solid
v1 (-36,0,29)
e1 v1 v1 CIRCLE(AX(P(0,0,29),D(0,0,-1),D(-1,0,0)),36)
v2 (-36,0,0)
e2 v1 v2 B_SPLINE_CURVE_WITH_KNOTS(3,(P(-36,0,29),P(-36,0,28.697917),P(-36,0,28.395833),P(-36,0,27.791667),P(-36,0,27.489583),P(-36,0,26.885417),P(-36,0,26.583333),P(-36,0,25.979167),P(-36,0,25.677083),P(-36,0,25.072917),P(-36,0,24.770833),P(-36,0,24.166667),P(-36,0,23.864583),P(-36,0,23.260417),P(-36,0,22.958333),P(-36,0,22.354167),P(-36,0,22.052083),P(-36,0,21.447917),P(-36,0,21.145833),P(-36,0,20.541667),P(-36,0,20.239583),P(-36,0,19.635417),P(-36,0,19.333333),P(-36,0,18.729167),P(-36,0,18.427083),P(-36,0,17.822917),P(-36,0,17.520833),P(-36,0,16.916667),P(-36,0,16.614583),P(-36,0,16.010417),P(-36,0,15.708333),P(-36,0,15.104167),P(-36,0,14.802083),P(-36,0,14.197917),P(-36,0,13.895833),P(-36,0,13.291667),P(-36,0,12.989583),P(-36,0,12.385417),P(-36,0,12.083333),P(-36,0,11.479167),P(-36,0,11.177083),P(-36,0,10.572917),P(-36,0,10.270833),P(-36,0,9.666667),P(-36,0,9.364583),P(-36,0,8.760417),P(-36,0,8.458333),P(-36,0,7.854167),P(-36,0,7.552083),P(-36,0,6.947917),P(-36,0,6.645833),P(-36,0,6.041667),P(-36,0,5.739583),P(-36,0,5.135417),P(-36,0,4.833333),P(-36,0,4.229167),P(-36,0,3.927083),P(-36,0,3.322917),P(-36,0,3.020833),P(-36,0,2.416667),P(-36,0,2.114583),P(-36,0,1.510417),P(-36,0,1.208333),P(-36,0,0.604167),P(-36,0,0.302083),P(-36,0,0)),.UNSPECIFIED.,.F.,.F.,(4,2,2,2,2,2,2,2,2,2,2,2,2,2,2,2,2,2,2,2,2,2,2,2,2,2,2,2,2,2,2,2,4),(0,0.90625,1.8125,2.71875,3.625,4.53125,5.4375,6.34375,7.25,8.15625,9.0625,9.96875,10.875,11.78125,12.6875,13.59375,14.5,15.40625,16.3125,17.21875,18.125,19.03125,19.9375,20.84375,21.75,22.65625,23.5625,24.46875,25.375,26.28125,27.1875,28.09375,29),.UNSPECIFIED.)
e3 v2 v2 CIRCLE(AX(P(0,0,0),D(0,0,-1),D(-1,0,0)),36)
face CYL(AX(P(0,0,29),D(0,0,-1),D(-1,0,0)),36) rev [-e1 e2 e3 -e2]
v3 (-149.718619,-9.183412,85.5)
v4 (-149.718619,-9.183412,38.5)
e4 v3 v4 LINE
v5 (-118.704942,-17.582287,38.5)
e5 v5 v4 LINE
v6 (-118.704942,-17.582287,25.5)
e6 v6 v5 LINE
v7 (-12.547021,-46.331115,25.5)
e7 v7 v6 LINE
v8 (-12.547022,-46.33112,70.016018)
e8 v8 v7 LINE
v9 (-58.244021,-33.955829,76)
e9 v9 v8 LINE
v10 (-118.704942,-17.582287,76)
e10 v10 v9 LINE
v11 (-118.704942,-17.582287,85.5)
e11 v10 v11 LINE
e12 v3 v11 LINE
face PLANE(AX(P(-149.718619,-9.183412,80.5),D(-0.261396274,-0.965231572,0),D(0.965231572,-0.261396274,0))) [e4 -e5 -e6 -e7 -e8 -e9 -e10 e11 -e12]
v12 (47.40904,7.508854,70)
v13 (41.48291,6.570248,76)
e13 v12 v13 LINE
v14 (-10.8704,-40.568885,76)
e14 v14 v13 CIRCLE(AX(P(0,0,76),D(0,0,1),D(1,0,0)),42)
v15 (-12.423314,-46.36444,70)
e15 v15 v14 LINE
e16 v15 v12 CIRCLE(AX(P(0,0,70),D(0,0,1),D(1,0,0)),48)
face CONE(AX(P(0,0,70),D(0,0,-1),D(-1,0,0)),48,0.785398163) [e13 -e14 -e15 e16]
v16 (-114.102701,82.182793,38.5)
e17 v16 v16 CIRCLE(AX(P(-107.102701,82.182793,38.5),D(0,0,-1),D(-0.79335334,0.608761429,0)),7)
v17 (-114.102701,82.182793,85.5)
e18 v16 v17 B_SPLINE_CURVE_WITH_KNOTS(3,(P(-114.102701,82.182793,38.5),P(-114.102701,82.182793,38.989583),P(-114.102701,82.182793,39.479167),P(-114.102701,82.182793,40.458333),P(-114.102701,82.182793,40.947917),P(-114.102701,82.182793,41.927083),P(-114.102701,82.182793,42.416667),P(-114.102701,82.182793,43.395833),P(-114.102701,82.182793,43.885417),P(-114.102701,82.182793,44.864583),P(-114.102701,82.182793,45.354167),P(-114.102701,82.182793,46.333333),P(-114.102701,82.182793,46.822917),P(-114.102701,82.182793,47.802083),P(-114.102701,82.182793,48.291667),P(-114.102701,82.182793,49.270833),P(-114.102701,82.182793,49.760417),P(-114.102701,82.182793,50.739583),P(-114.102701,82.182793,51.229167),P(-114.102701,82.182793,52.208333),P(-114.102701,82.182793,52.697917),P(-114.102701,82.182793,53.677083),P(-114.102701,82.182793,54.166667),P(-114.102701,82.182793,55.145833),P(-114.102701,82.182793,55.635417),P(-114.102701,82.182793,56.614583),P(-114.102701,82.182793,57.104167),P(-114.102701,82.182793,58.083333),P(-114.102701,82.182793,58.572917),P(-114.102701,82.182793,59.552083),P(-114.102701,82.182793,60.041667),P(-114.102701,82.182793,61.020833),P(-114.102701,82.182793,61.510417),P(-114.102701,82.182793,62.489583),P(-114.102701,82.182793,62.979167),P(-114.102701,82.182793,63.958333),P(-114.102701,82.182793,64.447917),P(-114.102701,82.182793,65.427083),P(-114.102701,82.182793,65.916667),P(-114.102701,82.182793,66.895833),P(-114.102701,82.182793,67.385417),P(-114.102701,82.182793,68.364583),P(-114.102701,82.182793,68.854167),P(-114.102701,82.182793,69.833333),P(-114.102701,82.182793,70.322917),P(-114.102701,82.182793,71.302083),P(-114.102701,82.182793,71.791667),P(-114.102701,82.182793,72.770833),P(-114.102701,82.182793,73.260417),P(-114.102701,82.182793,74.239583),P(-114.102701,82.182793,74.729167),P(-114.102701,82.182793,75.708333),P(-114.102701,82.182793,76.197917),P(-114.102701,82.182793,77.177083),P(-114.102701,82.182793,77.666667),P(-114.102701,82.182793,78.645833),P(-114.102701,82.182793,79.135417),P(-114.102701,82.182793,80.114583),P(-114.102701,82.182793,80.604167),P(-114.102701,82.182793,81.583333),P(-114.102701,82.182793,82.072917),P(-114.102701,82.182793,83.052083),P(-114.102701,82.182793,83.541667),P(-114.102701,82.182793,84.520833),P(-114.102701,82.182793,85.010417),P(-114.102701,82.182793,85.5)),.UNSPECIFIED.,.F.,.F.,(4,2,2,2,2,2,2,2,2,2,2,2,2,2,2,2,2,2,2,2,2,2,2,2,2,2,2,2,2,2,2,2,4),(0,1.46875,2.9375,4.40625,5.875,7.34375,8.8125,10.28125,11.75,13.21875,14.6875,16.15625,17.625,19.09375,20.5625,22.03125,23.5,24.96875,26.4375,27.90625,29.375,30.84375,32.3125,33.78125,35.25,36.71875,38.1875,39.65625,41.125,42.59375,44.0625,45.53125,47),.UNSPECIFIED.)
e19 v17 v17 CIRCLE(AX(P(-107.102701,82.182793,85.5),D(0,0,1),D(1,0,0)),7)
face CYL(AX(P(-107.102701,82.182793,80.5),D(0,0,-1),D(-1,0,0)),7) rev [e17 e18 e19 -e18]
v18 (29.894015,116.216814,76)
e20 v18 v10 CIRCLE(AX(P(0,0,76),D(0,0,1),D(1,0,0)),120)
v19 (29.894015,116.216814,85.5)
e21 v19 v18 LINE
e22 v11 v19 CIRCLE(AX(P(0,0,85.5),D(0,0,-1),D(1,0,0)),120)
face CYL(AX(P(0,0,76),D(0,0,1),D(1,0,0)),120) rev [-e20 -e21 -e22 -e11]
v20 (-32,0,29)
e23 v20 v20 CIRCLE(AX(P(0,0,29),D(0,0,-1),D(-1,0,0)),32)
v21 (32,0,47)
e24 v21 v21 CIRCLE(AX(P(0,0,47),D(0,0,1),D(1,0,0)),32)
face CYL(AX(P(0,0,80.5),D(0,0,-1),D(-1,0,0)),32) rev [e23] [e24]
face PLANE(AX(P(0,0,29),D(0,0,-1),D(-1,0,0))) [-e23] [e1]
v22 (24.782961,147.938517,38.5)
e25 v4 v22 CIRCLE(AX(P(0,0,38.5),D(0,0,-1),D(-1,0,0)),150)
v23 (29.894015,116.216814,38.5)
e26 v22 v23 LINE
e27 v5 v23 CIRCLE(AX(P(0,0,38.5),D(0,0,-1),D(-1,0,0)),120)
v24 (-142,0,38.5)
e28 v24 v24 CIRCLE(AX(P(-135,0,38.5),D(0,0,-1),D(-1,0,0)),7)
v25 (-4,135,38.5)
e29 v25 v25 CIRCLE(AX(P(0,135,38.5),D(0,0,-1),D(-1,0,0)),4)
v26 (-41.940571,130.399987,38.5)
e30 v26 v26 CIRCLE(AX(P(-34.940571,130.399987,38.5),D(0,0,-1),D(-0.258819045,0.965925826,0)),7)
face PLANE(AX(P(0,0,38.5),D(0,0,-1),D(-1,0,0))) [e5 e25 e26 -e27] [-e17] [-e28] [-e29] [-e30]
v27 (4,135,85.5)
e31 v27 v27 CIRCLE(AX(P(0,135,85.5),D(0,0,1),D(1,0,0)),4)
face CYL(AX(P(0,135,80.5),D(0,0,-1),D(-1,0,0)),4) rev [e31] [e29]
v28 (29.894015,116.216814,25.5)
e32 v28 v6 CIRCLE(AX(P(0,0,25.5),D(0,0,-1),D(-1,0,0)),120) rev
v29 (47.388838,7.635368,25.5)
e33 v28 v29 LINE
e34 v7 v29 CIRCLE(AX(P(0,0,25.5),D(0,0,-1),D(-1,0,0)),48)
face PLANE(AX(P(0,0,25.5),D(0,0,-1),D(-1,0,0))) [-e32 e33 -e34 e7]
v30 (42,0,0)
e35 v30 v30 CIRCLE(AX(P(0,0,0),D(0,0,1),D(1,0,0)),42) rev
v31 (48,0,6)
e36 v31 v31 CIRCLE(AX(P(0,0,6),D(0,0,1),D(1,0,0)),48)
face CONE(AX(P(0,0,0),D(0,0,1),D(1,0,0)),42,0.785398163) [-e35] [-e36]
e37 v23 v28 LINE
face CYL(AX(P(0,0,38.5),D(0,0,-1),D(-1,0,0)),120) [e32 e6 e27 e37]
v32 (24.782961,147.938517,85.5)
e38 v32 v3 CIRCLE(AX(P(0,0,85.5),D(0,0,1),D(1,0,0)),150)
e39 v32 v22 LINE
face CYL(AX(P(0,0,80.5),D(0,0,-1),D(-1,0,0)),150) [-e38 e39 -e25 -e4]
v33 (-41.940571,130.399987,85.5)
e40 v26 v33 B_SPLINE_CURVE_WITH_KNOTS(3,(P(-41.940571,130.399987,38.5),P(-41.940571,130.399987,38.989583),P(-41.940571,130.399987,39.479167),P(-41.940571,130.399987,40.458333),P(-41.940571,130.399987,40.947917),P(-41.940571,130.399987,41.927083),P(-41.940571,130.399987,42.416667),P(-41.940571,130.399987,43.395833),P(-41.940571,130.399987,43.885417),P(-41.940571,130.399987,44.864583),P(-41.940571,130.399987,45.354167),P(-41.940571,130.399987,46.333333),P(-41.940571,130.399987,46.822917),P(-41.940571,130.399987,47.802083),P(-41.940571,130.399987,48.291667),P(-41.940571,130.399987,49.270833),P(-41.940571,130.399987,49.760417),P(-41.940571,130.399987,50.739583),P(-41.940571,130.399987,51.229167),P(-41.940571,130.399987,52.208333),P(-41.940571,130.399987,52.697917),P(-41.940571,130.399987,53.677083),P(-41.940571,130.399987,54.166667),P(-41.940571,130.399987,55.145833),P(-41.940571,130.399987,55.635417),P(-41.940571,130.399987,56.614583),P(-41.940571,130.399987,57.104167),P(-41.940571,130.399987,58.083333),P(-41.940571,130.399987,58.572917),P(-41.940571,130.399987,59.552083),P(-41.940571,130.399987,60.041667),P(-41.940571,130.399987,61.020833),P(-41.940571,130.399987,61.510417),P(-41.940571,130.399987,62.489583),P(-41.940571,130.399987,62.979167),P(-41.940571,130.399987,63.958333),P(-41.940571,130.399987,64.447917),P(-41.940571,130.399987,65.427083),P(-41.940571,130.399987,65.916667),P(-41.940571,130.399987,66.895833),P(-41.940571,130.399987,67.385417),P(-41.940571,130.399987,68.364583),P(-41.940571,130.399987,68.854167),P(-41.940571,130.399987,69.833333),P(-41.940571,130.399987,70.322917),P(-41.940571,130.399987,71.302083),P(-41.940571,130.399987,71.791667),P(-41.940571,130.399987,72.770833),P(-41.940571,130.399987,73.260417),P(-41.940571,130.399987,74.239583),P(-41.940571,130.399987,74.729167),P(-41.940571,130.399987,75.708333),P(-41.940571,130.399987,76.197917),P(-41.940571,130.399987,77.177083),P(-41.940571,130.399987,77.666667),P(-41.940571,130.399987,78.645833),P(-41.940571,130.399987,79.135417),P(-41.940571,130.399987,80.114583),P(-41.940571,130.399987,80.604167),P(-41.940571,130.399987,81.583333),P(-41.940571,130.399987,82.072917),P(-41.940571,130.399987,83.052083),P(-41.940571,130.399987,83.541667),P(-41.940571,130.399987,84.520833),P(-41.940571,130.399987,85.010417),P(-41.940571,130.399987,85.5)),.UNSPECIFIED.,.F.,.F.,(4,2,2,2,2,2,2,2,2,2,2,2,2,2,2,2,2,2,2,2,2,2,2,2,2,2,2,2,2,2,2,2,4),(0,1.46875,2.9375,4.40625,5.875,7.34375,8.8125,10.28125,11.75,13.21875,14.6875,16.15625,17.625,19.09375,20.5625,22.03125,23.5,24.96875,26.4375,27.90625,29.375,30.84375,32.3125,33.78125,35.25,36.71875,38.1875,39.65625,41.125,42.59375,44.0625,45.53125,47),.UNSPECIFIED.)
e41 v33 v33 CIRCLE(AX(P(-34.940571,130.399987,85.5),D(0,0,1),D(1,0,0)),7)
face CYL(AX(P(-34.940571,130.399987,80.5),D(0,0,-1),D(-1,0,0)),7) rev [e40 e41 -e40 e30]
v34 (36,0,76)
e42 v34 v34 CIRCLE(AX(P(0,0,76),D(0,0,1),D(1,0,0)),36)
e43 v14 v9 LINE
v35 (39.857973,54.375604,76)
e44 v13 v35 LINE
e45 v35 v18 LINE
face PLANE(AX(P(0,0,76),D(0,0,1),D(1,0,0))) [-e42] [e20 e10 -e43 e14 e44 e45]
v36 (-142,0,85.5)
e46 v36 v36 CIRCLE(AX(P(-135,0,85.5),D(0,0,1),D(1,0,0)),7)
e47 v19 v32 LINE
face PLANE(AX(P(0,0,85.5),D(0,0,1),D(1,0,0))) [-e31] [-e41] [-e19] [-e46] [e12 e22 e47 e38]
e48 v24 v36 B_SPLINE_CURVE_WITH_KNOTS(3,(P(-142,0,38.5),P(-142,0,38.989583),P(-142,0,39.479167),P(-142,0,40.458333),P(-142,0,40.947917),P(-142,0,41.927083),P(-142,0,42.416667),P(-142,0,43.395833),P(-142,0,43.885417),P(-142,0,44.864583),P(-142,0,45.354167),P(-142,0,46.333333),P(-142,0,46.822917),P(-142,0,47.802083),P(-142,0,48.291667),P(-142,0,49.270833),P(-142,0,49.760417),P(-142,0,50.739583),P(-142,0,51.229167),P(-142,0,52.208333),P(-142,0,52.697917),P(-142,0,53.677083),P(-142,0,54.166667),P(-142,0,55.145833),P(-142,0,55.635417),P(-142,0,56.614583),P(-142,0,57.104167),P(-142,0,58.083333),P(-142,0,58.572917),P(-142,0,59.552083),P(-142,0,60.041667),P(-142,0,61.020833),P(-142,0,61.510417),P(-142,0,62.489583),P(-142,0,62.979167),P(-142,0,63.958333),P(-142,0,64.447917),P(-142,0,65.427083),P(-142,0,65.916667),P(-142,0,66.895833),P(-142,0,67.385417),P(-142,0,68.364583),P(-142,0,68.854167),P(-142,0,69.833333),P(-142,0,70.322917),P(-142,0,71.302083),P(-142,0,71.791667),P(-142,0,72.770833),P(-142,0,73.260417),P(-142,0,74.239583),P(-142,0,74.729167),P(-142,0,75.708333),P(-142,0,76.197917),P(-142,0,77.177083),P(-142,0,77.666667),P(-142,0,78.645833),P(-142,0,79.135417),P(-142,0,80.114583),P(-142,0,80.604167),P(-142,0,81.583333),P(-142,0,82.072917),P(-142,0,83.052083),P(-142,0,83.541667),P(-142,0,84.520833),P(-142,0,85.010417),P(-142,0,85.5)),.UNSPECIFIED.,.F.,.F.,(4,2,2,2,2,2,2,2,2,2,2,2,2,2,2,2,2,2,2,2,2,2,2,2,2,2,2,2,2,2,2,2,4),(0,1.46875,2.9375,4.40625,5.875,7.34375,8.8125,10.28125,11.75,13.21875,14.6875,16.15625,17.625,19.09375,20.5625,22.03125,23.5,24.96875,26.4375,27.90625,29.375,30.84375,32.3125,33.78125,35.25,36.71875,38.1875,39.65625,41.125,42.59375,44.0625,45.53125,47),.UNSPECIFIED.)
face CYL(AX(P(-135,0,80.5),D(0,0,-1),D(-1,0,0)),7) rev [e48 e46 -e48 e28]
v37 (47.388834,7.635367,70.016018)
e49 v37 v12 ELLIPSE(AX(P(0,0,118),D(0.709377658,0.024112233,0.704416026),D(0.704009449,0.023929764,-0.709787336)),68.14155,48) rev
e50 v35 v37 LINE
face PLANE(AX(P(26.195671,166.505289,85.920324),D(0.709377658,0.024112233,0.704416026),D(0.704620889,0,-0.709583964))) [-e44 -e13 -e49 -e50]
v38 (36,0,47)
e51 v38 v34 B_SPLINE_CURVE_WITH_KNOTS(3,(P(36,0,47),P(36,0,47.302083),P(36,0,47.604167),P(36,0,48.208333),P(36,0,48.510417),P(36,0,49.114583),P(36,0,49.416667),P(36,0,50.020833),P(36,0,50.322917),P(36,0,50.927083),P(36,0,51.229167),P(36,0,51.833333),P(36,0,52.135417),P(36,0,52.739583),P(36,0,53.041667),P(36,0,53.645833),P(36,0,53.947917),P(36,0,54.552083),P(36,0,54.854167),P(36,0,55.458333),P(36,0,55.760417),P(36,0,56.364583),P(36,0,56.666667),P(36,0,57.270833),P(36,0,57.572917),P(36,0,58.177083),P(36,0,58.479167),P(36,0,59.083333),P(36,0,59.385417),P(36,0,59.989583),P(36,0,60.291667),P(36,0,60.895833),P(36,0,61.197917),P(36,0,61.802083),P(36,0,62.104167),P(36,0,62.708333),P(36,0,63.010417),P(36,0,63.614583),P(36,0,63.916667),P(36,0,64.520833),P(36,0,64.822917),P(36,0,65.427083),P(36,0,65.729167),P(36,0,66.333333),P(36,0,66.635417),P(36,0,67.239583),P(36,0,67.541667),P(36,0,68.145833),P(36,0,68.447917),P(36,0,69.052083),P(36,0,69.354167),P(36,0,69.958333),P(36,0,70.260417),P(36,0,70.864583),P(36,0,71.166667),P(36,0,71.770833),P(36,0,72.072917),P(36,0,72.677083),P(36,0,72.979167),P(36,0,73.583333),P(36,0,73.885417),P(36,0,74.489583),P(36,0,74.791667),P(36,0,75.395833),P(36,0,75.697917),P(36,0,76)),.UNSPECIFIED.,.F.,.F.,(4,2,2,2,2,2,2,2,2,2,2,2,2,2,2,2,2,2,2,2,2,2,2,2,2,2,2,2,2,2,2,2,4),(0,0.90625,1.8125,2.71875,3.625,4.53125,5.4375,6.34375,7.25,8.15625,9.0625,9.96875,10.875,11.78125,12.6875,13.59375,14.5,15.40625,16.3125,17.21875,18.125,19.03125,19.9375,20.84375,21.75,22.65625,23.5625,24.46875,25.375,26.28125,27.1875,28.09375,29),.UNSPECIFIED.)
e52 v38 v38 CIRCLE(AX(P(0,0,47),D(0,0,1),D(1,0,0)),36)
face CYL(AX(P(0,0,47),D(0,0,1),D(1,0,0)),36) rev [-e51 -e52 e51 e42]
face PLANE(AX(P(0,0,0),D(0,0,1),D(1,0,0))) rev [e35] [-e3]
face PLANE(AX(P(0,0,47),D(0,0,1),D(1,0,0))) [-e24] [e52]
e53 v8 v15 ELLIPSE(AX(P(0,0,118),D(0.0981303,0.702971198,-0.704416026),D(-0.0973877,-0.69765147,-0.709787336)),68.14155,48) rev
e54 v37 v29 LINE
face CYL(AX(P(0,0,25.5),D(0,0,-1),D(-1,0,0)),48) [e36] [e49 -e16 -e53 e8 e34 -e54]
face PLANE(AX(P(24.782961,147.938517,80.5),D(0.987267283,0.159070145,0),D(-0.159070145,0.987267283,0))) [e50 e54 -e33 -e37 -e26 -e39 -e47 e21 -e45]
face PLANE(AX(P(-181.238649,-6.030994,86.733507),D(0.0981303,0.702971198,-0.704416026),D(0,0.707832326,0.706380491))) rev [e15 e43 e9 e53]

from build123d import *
from OCP.BRepAlgoAPI import BRepAlgoAPI_Cut
from OCP.TopTools import TopTools_ListOfShape
from build123d.topology import SkipClean

# Parameters (mm, degrees)
SCHIZZO1_R                          = 150
SCHIZZO1_R_2                        = 32
ESTRUSIONE1_DEPTH                   = 80.5
SCHIZZO2_R                          = 120
ESTRUSIONE2_DEPTH                   = 4.5
SCHIZZO3_R                          = 36
ESTRUSIONE3_DEPTH                   = 29
ESTRUSIONE4_START                   = -29
SCHIZZO4_R                          = 36
ESTRUSIONE4_DEPTH                   = 29
SCHIZZO5_OUTSIDE_W                  = 388.366
SCHIZZO5_OUTSIDE_H                  = 388.366
SCHIZZO5_OUTSIDE_R                  = 120
ESTRUSIONE5_DEPTH                   = 38.5
SCHIZZO6_OUTSIDE_W                  = 388.366
SCHIZZO6_OUTSIDE_H                  = 388.366
SCHIZZO6_OUTSIDE_R                  = 48
ESTRUSIONE6_DEPTH                   = 25.5
SCHIZZO7_R                          = 4
ESTRUSIONE7_DEPTH                   = 220.146070008
SCHIZZO8_R                          = 7
ESTRUSIONE8_DEPTH                   = 217.249855491
RIPETIZIONECIRCOLARE1_COUNT         = 3
RIPETIZIONECIRCOLARE1_ANGLE         = 75
SCHIZZO9_OUTSIDE_W                  = 388.366
SCHIZZO9_OUTSIDE_H                  = 388.366
ESTRUSIONE9_DEPTH                   = 220.146070008
SMUSSO1_SIZE                        = 6
TAGLIA_RIVOLUZIONE1_ANGLE           = 15
TAGLIA_RIVOLUZIONE1_OTHER_WAY_ANGLE = 99
ESTRUSIONE10_DEPTH                  = 222.553987295
ESTRUSIONE11_DEPTH                  = 222.120460483
SCHIZZO14_R                         = 7
SCHIZZO14_R_2                       = 4
ESTRUSIONE12_DEPTH                  = 5


with BuildPart() as part:
    # Schizzo1 → Estrusione1 (new body)
    with BuildSketch(Plane.XY):
        Circle(SCHIZZO1_R)
        Circle(SCHIZZO1_R_2, mode=Mode.SUBTRACT)
    extrude(amount=ESTRUSIONE1_DEPTH)

    # Schizzo2 → Estrusione2 (cut)
    with BuildSketch(Plane.XY.offset(80.5)):
        Circle(SCHIZZO2_R)
    extrude(amount=-ESTRUSIONE2_DEPTH, mode=Mode.SUBTRACT)

    # Schizzo3 → Estrusione3 (cut)
    with BuildSketch(Plane.XY.offset(76)):
        Circle(SCHIZZO3_R)
    extrude(amount=-ESTRUSIONE3_DEPTH, mode=Mode.SUBTRACT)

    # Schizzo4 → Estrusione4 (cut)
    with BuildSketch(Plane(origin=(0, 0, 0), x_dir=(-1, 0, 0), z_dir=(0, 0, -1)).offset(ESTRUSIONE4_START)):
        Circle(SCHIZZO4_R)
    extrude(amount=ESTRUSIONE4_DEPTH, mode=Mode.SUBTRACT)

    # Schizzo5 outside → Estrusione5 (cut)
    with BuildSketch(Plane(origin=(0, 0, 0), x_dir=(-1, 0, 0), z_dir=(0, 0, -1))):
        Rectangle(SCHIZZO5_OUTSIDE_W, SCHIZZO5_OUTSIDE_H)
        Circle(SCHIZZO5_OUTSIDE_R, mode=Mode.SUBTRACT)
    extrude(amount=-ESTRUSIONE5_DEPTH, mode=Mode.SUBTRACT)

    # Schizzo6 outside → Estrusione6 (cut)
    with BuildSketch(Plane(origin=(0, 0, 0), x_dir=(-1, 0, 0), z_dir=(0, 0, -1))):
        Rectangle(SCHIZZO6_OUTSIDE_W, SCHIZZO6_OUTSIDE_H)
        Circle(SCHIZZO6_OUTSIDE_R, mode=Mode.SUBTRACT)
    extrude(amount=-ESTRUSIONE6_DEPTH, mode=Mode.SUBTRACT)

    # Schizzo7 → Estrusione7 (cut, through all)
    with BuildSketch(Plane(origin=(0, 0, 25.5), x_dir=(-1, 0, 0), z_dir=(0, 0, -1))):
        with Locations((0, 135)):
            Circle(SCHIZZO7_R)
    extrude(amount=-ESTRUSIONE7_DEPTH, mode=Mode.SUBTRACT)

    # Schizzo8 → Estrusione8 (cut, through all)
    with BuildSketch(Plane(origin=(0, 0, 38.5), x_dir=(-1, 0, 0), z_dir=(0, 0, -1))):
        with Locations((135, 0)):
            Circle(SCHIZZO8_R)
    estrusione8 = extrude(amount=-ESTRUSIONE8_DEPTH, mode=Mode.SUBTRACT)

    # RipetizioneCircolare1: Estrusione8 ×3 about axis
    ripetizionecircolare1_axis = Axis((0, 0, 38.5), (0, 0, -1))
    for i in range(1, RIPETIZIONECIRCOLARE1_COUNT):
        add(estrusione8.rotate(ripetizionecircolare1_axis, i * RIPETIZIONECIRCOLARE1_ANGLE / (RIPETIZIONECIRCOLARE1_COUNT - 1)), mode=Mode.SUBTRACT)

    # Schizzo9 outside → Estrusione9 (cut, through all)
    with BuildSketch(Plane(origin=(0, 0, 25.5), x_dir=(-1, 0, 0), z_dir=(0, 0, -1))):
        Rectangle(SCHIZZO9_OUTSIDE_W, SCHIZZO9_OUTSIDE_H)
        with BuildLine():
            Line((-24.782961399, 147.938517041), (-47.388837837, 7.635368288))
            ThreePointArc((-47.388837837, 7.635368288), (-32.118274684, -35.670957819), (12.547023337, -46.331123511))
            Line((12.547023337, -46.331123511), (149.718619236, -9.183411899))
            ThreePointArc((149.718619236, -9.183411899), (100.369590954, 111.471723822), (-24.782961399, 147.938517041))
        make_face(mode=Mode.SUBTRACT)
    extrude(amount=-ESTRUSIONE9_DEPTH, mode=Mode.SUBTRACT)

    # Smusso1
    smusso1_edges = [part.edges().sort_by_distance(p)[0] for p in [
        (48, 0, 0),
    ]]
    chamfer(smusso1_edges, length=SMUSSO1_SIZE)


with BuildPart() as taglia_rivoluzione1_tool:
    # Schizzo10 → Taglia-Rivoluzione1 (revolve)
    with BuildSketch(Plane(origin=(0, 0, 0), x_dir=(0, 0, -1), z_dir=(1, 0, 0))):
        Polygon((-76, -42), (-70, -48), (-76, -48), align=None)
    revolve(axis=Axis((0, 0, 80.5), (0, 0, -1)), revolution_arc=TAGLIA_RIVOLUZIONE1_ANGLE)


with BuildPart() as part_1:
    add(part.part)

    # Taglia-Rivoluzione1: cut by taglia_rivoluzione1_tool, with a tolerance
    taglia_rivoluzione1_stock = TopTools_ListOfShape()
    taglia_rivoluzione1_stock.Append(part_1.part.wrapped)
    taglia_rivoluzione1_tools = TopTools_ListOfShape()
    taglia_rivoluzione1_tools.Append(taglia_rivoluzione1_tool.part.wrapped)
    taglia_rivoluzione1_cut = BRepAlgoAPI_Cut()
    taglia_rivoluzione1_cut.SetArguments(taglia_rivoluzione1_stock)
    taglia_rivoluzione1_cut.SetTools(taglia_rivoluzione1_tools)
    taglia_rivoluzione1_cut.SetFuzzyValue(0.00001)
    taglia_rivoluzione1_cut.Build()
    add(Compound.cast(taglia_rivoluzione1_cut.Shape()).solids(), mode=Mode.REPLACE)


with BuildPart() as taglia_rivoluzione1_other_way_tool:
    # Schizzo10 → Taglia-Rivoluzione1 other way (revolve)
    with BuildSketch(Plane(origin=(0, 0, 0), x_dir=(0, 0, -1), z_dir=(1, 0, 0))):
        Polygon((-76, -42), (-70, -48), (-76, -48), align=None)
    revolve(axis=Axis((0, 0, 80.5), (0, 0, 1)), revolution_arc=TAGLIA_RIVOLUZIONE1_OTHER_WAY_ANGLE)


with BuildPart() as part_2:
    add(part_1.part)

    # Taglia-Rivoluzione1 other way: cut by taglia_rivoluzione1_other_way_tool, with a tolerance
    taglia_rivoluzione1_other_way_stock = TopTools_ListOfShape()
    taglia_rivoluzione1_other_way_stock.Append(part_2.part.wrapped)
    taglia_rivoluzione1_other_way_tools = TopTools_ListOfShape()
    taglia_rivoluzione1_other_way_tools.Append(taglia_rivoluzione1_other_way_tool.part.wrapped)
    taglia_rivoluzione1_other_way_cut = BRepAlgoAPI_Cut()
    taglia_rivoluzione1_other_way_cut.SetArguments(taglia_rivoluzione1_other_way_stock)
    taglia_rivoluzione1_other_way_cut.SetTools(taglia_rivoluzione1_other_way_tools)
    taglia_rivoluzione1_other_way_cut.SetFuzzyValue(0.00001)
    taglia_rivoluzione1_other_way_cut.Build()
    add(Compound.cast(taglia_rivoluzione1_other_way_cut.Shape()).solids(), mode=Mode.REPLACE)

    # Schizzo12 → Estrusione10 (cut, through all)
    with BuildSketch(Plane(origin=(-0.690632867, 7.225398294, 0.448171286), x_dir=(-0.9954801399088248, -0.09476952983284632, -0.006166624876533003), z_dir=(-0.09496951603195239, 0.9935706966681883, 0.06162841671621708))):
        Polygon((-42.386736114, 75.435272849), (-48.338032454, 69.386961359), (-48.869626952, 76.181229843), align=None)
    extrude(amount=ESTRUSIONE10_DEPTH, mode=Mode.SUBTRACT)

    # Schizzo13 → Estrusione11 (cut, through all)
    with BuildSketch(Plane(origin=(-7.113626014, 1.442109288, 0.448171286), x_dir=(-0.06616982044642228, -0.016349891837027383, -0.9976744137738552), z_dir=(0.9782007948647303, -0.19830568115679875, -0.06162841671621941))):
        Polygon((-74.440666161, -44.110123665), (-68.257106923, -49.920768651), (-76.463406466, -52.458204579), align=None)
    extrude(amount=-ESTRUSIONE11_DEPTH, mode=Mode.SUBTRACT)

    # Schizzo14 → Estrusione12 (add)
    with SkipClean():  # the faces are left unmerged after this step: merging them gives an invalid solid
        with BuildSketch(Plane.XY.offset(80.5)):
            with BuildLine():
                Line((24.782961399, 147.938517041), (29.894014885, 116.216814076))
                ThreePointArc((29.894014885, 116.216814076), (-80.295672763, 89.177379057), (-118.704941646, -17.582287363))
                Line((-118.704941646, -17.582287363), (-149.718619236, -9.183411899))
                ThreePointArc((-149.718619236, -9.183411899), (-100.369590954, 111.471723822), (24.782961399, 147.938517041))
            make_face()
            with Locations((-135, 0)):
                Circle(SCHIZZO14_R, mode=Mode.SUBTRACT)
            with Locations((-107.102700939, 82.182792916)):
                Circle(SCHIZZO14_R, mode=Mode.SUBTRACT)
            with Locations((-34.940571089, 130.399986549)):
                Circle(SCHIZZO14_R, mode=Mode.SUBTRACT)
            with Locations((0, 135)):
                Circle(SCHIZZO14_R_2, mode=Mode.SUBTRACT)
        extrude(amount=ESTRUSIONE12_DEPTH)


solid = part_2.part
